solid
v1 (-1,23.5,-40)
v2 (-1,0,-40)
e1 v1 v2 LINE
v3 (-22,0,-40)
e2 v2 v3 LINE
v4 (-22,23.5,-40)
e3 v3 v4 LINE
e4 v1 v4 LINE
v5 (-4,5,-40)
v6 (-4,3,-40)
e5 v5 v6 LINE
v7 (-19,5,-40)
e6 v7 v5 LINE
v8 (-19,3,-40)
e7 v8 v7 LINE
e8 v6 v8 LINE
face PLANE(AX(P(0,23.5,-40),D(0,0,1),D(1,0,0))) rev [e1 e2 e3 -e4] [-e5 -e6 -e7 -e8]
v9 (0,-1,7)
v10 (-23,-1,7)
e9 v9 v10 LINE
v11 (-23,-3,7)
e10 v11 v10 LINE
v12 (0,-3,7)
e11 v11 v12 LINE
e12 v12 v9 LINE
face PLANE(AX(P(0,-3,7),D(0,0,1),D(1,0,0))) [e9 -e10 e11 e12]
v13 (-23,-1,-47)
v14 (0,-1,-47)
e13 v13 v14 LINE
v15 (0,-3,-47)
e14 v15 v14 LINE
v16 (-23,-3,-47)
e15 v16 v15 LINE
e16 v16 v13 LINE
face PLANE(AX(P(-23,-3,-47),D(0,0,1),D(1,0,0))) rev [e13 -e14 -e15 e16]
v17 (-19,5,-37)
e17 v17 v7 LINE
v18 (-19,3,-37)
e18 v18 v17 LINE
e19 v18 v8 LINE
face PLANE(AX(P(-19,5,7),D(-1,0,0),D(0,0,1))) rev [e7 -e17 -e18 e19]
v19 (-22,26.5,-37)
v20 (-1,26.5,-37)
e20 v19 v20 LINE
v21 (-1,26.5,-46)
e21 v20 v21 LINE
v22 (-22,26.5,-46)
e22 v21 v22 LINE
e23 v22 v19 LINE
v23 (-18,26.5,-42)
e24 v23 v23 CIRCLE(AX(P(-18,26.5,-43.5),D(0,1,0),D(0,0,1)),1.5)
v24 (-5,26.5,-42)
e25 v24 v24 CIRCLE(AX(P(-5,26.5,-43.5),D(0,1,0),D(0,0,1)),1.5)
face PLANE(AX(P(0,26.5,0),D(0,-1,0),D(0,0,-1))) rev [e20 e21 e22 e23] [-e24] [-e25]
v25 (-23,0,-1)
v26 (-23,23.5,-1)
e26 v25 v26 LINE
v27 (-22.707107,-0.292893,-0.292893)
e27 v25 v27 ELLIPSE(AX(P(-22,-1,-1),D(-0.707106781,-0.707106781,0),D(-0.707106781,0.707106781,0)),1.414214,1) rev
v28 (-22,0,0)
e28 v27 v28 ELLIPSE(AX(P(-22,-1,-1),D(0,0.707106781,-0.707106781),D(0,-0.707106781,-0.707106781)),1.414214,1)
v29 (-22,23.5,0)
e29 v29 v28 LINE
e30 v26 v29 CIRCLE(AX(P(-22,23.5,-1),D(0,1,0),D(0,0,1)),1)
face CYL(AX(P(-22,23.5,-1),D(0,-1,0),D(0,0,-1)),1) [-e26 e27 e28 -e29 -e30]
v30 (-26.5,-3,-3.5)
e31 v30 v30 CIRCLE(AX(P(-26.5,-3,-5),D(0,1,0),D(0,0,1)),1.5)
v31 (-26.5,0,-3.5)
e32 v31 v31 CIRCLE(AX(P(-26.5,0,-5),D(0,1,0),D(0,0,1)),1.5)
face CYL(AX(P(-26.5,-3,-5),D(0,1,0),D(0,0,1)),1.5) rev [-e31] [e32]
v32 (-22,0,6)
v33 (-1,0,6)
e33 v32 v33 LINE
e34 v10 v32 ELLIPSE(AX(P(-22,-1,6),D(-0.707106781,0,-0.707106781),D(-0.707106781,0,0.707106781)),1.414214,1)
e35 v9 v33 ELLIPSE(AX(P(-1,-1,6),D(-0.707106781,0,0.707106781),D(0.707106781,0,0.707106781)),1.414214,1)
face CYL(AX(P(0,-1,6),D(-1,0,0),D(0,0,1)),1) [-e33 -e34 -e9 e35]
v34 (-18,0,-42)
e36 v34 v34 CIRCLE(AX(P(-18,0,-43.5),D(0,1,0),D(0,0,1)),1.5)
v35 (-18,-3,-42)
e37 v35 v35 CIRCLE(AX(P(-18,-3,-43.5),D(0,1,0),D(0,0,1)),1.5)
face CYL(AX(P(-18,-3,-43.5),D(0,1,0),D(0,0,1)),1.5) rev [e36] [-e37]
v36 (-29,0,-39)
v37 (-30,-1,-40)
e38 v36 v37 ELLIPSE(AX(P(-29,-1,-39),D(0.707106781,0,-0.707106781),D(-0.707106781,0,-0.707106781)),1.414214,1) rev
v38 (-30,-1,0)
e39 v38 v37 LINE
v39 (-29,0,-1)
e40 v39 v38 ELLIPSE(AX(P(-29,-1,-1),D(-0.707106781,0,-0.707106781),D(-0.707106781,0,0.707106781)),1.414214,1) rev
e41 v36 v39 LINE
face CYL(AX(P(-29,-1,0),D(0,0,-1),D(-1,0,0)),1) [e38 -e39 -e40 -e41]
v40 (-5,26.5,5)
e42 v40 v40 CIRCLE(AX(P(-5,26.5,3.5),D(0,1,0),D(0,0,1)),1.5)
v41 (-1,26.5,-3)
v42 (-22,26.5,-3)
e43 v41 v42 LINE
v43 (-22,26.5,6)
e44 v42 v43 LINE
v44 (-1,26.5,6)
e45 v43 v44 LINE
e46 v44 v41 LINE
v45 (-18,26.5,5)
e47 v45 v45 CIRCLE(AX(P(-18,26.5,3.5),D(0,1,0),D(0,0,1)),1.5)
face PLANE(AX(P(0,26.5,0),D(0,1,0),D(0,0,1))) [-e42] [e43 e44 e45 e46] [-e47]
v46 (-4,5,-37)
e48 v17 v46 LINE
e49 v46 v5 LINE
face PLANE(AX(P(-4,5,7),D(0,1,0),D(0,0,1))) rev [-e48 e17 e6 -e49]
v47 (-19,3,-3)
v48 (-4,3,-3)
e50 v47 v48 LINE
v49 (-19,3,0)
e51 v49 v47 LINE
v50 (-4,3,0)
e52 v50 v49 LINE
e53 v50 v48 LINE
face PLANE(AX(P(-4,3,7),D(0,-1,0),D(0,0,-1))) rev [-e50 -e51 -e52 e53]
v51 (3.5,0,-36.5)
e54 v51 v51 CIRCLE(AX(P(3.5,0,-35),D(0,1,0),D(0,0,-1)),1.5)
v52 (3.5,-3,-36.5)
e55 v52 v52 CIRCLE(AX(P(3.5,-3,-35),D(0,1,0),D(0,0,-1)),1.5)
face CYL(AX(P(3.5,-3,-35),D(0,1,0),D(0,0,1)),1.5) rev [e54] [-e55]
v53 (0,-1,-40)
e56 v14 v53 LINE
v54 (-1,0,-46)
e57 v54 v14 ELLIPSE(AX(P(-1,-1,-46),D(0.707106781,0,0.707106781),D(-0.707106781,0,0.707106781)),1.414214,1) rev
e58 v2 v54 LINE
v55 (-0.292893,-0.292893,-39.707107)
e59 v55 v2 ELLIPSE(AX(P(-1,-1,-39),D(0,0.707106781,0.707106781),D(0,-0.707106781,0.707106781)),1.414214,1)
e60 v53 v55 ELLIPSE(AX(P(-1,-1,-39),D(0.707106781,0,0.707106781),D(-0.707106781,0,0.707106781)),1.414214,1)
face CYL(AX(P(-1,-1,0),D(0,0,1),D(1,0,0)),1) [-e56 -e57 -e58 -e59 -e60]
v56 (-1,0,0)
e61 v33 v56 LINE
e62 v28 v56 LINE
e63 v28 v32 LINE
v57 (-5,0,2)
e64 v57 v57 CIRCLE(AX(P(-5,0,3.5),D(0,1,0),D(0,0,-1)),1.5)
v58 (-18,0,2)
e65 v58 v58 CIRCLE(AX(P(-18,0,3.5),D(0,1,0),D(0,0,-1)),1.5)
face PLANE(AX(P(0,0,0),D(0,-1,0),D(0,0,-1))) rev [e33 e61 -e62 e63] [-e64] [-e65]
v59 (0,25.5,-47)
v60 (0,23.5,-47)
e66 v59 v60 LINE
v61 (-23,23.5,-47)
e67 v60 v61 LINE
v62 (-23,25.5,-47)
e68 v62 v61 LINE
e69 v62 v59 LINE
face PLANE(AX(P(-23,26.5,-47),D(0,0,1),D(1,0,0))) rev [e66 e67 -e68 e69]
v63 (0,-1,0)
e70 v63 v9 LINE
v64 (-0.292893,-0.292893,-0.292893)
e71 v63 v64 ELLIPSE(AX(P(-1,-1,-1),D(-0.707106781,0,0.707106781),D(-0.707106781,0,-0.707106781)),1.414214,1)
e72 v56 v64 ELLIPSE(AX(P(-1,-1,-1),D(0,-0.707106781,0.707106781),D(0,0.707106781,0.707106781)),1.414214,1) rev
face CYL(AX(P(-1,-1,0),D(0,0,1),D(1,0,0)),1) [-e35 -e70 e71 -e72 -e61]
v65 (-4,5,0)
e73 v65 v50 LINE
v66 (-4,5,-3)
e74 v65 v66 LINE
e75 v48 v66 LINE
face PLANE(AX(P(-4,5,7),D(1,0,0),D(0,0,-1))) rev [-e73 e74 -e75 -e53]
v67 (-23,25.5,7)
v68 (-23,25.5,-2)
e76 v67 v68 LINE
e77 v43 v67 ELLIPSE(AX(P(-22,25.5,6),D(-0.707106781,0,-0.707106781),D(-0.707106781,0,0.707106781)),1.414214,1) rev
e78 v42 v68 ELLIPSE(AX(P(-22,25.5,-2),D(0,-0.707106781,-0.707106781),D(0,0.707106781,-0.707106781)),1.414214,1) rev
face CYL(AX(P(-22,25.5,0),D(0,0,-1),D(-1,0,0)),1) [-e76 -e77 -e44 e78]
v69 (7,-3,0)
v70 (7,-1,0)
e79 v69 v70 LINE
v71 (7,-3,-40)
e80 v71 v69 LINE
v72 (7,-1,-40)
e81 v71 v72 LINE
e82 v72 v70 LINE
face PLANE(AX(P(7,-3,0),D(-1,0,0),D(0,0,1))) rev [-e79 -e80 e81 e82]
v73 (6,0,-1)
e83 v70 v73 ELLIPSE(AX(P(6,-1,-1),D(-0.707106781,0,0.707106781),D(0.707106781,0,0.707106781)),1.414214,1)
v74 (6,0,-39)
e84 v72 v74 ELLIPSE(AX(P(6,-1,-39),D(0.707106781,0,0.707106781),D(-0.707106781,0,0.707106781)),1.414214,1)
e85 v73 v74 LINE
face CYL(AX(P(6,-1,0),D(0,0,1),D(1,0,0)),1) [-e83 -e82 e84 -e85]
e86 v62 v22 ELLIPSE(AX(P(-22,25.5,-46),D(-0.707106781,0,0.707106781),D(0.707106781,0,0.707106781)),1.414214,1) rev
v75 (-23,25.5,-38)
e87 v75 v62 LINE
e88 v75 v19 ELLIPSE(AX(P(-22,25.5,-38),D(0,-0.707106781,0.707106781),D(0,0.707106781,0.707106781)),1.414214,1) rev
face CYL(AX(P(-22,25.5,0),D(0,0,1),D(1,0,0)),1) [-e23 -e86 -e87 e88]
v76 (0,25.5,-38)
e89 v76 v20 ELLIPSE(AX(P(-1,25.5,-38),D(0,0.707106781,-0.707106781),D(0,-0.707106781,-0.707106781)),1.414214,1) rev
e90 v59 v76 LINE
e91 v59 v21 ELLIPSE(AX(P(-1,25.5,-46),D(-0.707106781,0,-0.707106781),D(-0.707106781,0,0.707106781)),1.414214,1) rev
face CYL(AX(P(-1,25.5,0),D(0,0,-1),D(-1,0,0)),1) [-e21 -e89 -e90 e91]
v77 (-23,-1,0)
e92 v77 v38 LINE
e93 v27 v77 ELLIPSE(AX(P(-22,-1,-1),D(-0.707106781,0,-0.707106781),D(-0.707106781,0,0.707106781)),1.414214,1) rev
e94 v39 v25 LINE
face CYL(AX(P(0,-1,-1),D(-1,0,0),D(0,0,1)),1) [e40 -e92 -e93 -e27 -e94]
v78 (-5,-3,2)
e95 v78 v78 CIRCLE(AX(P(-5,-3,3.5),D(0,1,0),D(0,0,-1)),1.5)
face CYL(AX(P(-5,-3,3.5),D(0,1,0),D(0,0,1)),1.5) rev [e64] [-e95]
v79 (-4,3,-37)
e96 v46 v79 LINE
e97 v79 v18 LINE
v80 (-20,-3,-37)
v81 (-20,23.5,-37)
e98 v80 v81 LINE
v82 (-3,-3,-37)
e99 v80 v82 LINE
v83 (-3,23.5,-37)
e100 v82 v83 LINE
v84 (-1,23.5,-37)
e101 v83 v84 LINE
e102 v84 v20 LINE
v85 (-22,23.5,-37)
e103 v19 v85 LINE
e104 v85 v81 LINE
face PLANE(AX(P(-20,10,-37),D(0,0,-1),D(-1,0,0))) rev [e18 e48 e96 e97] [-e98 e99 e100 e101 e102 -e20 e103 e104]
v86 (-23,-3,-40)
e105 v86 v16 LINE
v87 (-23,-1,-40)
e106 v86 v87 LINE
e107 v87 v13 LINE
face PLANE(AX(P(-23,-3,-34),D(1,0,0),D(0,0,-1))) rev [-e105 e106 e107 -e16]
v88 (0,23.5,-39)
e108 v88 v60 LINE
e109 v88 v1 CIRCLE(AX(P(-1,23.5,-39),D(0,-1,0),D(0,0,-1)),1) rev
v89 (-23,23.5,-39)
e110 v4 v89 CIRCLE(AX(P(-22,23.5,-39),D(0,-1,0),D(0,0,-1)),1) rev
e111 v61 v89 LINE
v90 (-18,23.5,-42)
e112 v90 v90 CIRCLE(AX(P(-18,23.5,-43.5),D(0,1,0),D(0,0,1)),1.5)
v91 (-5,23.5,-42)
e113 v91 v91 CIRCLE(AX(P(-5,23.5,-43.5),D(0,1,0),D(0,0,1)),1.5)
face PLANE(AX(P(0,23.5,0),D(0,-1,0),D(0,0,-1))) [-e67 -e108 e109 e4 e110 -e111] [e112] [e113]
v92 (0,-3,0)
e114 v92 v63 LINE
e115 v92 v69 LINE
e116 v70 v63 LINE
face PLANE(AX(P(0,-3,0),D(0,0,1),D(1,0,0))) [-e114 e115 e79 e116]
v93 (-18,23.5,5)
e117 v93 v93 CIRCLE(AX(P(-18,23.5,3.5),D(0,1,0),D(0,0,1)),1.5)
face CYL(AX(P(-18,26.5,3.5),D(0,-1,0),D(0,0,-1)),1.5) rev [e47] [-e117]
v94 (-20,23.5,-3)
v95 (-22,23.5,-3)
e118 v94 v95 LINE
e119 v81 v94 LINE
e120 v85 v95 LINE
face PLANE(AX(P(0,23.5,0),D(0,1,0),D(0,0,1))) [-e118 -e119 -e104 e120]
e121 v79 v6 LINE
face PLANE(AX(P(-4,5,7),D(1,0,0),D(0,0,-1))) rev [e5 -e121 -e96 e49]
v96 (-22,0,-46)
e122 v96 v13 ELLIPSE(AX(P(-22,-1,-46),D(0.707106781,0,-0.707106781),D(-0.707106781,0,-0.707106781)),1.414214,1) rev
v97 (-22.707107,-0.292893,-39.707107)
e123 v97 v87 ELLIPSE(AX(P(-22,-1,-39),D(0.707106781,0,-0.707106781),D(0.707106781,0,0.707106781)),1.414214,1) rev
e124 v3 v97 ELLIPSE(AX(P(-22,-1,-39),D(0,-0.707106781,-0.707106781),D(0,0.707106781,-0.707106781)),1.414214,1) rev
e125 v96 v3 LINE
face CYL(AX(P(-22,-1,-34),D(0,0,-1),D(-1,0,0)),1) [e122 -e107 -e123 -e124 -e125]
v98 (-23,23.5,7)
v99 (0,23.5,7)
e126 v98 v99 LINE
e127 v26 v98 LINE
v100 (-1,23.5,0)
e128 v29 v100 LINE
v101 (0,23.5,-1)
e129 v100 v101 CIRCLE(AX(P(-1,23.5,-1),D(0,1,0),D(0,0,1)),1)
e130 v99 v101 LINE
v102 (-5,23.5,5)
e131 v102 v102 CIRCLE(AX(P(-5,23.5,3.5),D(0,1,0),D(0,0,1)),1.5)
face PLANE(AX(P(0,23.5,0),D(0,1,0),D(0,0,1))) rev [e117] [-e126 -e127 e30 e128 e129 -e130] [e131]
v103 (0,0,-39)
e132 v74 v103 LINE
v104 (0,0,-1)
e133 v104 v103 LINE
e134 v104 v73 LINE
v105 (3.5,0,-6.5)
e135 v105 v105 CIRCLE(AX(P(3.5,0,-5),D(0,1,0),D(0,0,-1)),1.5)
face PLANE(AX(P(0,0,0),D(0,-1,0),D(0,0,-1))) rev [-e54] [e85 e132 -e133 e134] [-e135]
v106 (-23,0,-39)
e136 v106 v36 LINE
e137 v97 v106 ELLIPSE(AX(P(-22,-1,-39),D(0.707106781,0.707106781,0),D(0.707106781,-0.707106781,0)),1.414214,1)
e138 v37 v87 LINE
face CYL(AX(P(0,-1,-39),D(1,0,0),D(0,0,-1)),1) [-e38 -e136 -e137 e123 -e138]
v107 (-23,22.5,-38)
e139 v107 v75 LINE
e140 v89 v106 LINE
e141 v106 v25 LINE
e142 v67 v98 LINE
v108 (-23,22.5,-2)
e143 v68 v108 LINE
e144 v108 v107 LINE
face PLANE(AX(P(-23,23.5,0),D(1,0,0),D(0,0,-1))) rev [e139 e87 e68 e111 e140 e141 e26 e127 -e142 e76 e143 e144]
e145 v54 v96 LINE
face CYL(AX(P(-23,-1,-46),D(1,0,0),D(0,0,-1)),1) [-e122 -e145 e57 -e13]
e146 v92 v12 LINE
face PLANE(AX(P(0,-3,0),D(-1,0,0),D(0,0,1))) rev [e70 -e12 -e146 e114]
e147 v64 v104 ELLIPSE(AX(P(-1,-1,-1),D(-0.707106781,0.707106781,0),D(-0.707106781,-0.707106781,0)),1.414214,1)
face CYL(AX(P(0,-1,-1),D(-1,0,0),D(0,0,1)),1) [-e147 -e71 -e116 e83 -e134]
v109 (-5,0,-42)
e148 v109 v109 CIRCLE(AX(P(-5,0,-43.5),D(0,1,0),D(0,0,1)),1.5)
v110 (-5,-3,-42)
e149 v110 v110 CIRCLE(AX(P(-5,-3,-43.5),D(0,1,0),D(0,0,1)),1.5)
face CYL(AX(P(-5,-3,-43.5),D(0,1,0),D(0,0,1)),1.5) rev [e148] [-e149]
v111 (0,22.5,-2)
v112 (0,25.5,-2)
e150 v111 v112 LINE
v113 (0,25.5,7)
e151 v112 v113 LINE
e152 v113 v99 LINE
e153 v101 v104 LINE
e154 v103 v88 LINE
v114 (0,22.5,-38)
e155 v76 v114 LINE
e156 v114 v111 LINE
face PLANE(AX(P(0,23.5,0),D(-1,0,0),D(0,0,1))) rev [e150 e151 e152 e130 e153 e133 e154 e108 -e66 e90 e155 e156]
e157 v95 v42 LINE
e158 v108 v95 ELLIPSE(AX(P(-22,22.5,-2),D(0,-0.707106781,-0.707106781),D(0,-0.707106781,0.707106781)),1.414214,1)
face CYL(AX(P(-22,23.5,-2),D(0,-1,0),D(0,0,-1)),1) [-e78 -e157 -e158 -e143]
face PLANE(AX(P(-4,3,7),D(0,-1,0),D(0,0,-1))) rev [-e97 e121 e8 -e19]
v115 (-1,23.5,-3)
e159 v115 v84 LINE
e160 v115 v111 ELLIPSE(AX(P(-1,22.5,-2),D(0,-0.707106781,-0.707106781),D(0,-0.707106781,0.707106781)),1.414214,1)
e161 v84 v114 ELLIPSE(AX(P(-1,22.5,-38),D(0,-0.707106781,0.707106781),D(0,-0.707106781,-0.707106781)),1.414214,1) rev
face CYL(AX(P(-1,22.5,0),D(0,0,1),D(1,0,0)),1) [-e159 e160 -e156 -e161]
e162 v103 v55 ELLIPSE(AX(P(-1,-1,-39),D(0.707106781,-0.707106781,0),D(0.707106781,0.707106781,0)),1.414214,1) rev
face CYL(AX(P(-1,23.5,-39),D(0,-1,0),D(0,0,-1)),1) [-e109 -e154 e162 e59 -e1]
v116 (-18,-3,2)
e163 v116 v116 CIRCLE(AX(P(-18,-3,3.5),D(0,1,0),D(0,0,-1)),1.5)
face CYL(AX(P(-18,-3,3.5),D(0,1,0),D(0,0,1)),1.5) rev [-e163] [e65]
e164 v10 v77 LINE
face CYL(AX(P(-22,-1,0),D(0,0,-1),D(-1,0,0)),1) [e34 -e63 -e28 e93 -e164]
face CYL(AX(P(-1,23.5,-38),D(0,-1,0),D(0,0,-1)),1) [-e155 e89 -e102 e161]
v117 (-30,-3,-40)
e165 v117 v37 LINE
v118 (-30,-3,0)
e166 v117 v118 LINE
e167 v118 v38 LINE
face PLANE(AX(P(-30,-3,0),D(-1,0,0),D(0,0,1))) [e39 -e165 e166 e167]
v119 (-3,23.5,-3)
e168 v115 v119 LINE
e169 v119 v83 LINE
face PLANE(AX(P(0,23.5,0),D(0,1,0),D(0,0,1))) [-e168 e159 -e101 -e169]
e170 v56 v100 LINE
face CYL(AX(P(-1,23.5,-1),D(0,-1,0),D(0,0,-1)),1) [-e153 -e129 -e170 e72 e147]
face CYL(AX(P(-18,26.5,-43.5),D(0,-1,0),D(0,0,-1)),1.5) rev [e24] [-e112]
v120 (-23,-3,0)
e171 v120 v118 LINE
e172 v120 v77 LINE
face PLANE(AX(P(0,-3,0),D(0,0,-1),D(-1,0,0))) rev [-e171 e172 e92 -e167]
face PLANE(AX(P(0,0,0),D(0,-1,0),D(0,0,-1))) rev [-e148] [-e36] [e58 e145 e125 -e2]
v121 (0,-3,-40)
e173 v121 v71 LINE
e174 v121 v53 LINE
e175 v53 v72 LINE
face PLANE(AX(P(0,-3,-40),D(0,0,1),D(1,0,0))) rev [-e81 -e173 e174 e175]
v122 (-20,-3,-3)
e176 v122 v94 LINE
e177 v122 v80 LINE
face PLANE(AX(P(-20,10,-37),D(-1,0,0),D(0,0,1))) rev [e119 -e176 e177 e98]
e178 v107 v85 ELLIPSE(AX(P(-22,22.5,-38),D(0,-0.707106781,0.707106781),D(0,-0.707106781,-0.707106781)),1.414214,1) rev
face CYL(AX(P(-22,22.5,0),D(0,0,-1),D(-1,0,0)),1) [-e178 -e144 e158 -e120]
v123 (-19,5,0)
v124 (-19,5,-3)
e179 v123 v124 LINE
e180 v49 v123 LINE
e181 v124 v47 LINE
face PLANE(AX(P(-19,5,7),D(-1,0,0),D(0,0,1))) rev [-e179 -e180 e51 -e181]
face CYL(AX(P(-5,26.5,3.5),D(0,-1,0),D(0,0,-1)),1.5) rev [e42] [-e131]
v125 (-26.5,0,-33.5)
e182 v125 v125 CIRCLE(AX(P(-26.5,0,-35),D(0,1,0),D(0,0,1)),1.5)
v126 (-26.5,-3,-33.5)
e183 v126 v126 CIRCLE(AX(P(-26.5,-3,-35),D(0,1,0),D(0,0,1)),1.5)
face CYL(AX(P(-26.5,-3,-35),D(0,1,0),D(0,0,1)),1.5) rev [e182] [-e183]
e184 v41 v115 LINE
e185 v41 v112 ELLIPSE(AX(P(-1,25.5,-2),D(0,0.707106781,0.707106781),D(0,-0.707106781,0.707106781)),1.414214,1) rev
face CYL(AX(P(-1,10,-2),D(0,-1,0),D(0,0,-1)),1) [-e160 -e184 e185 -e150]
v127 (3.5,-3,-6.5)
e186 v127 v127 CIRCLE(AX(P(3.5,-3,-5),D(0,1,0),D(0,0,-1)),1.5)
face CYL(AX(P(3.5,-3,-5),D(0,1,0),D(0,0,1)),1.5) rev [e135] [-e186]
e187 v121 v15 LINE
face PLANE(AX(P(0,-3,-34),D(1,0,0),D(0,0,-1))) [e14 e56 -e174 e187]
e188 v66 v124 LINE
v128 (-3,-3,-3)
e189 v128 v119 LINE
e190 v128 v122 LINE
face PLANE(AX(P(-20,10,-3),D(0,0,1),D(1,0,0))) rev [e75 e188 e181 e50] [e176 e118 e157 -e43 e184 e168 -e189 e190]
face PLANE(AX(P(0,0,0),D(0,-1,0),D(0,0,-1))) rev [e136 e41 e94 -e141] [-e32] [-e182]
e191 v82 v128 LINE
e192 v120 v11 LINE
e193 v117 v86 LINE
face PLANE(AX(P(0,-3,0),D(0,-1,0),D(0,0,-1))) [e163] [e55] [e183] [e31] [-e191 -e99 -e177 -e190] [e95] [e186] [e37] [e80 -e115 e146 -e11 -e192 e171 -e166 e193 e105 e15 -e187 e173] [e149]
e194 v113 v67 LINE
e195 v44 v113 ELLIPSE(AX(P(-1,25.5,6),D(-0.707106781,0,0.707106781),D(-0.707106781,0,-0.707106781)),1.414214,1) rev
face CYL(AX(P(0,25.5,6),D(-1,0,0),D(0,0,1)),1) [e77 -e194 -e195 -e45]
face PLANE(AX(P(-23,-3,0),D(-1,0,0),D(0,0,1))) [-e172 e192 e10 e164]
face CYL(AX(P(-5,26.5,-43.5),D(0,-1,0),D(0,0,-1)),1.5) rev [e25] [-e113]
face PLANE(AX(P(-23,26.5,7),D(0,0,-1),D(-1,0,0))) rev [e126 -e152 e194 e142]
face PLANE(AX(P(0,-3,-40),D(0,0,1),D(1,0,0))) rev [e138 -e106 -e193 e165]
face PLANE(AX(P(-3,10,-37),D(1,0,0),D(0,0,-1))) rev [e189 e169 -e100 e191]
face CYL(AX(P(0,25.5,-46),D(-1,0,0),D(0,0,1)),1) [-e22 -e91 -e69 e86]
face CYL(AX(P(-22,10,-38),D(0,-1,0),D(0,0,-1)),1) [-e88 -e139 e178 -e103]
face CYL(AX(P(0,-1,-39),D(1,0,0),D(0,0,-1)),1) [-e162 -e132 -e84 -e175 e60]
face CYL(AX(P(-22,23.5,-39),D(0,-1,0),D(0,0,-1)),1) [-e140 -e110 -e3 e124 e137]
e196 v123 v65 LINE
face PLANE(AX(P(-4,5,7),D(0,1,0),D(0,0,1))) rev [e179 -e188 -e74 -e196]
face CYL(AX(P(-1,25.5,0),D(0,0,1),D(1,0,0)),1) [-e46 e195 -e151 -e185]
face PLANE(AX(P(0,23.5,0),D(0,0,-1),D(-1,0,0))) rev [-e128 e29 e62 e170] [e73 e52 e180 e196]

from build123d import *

# Parameters (mm, degrees)
CROQUIS2_W              = 23
CROQUIS2_H              = 40
SALIENTE_EXTRUIR1_DEPTH = 23.5
CROQUIS3_W              = 17
CROQUIS3_H              = 34
CORTAR_EXTRUIR1_DEPTH   = 13.5
CROQUIS4_W              = 13
CROQUIS4_H              = 40
CROQUIS4_W_2            = 23
CROQUIS4_H_2            = 13
SALIENTE_EXTRUIR6_DEPTH = 3
CROQUIS6_R              = 1.5
CORTAR_EXTRUIR2_DEPTH   = 61.508263898
SALIENTE_EXTRUIR7_START = 3
CROQUIS7_W              = 23
CROQUIS7_H              = 10
CROQUIS7_R              = 1.5
SALIENTE_EXTRUIR7_DEPTH = 3
REDONDEO1_R             = 1
REDONDEO2_R             = 1
REDONDEO3_R             = 1
CROQUIS8_W              = 17
CROQUIS8_H              = 34
CORTAR_EXTRUIR3_DEPTH   = 64.081296753
CROQUIS9_W              = 15
CROQUIS9_H              = 2
CORTAR_EXTRUIR4_DEPTH   = 62.735322142


with BuildPart() as part:
    # Croquis2 → Saliente-Extruir1 (new body)
    with BuildSketch(Plane(origin=(0, 0, 0), x_dir=(1, 0, 0), z_dir=(0, 1, 0))):
        with Locations((-11.5, 20)):
            Rectangle(CROQUIS2_W, CROQUIS2_H)
    extrude(amount=SALIENTE_EXTRUIR1_DEPTH)

    # Croquis3 → Cortar-Extruir1 (cut)
    with BuildSketch(Plane(origin=(0, 23.5, 0), x_dir=(1, 0, 0), z_dir=(0, 1, 0))):
        with Locations((-11.5, 20)):
            Rectangle(CROQUIS3_W, CROQUIS3_H)
    extrude(amount=-CORTAR_EXTRUIR1_DEPTH, mode=Mode.SUBTRACT)

    # Croquis4 → Saliente-Extruir6 (add)
    with BuildSketch(Plane.XZ):
        with Locations((-23.5, -20)):
            Rectangle(CROQUIS4_W, CROQUIS4_H)
        with Locations((-11.5, 0.5)):
            Rectangle(CROQUIS4_W_2, CROQUIS4_H_2)
        with Locations((0.5, -20)):
            Rectangle(CROQUIS4_W, CROQUIS4_H)
        with Locations((-11.5, -40.5)):
            Rectangle(CROQUIS4_W_2, CROQUIS4_H_2)
    extrude(amount=SALIENTE_EXTRUIR6_DEPTH)

    # Croquis6 → Cortar-Extruir2 (cut, through all)
    with BuildSketch(Plane(origin=(0, 0, 0), x_dir=(1, 0, 0), z_dir=(0, 1, 0))):
        with Locations(Location((-26.5, 5, 0), (0, 0, 270))):
            Circle(CROQUIS6_R)
        with Locations(Location((-26.5, 35, 0), (0, 0, 270))):
            Circle(CROQUIS6_R)
        with Locations(Location((-18, 43.5, 0), (0, 0, 270))):
            Circle(CROQUIS6_R)
        with Locations(Location((-5, 43.5, 0), (0, 0, 270))):
            Circle(CROQUIS6_R)
        with Locations(Location((3.5, 5, 0), (0, 0, 90))):
            Circle(CROQUIS6_R)
        with Locations(Location((3.5, 35, 0), (0, 0, 90))):
            Circle(CROQUIS6_R)
        with Locations(Location((-5, -3.5, 0), (0, 0, 90))):
            Circle(CROQUIS6_R)
        with Locations(Location((-18, -3.5, 0), (0, 0, 90))):
            Circle(CROQUIS6_R)
    extrude(amount=-CORTAR_EXTRUIR2_DEPTH, mode=Mode.SUBTRACT)

    # Croquis7 → Saliente-Extruir7 (add)
    # profile 1 of 2: a face of its own
    with BuildSketch(Plane(origin=(0, 23.5, 0), x_dir=(1, 0, 0), z_dir=(0, 1, 0)).offset(SALIENTE_EXTRUIR7_START)):
        with Locations((-11.5, 42)):
            Rectangle(CROQUIS7_W, CROQUIS7_H)
        with Locations(Location((-18, 43.5, 0), (0, 0, 270))):
            Circle(CROQUIS7_R, mode=Mode.SUBTRACT)
        with Locations(Location((-5, 43.5, 0), (0, 0, 270))):
            Circle(CROQUIS7_R, mode=Mode.SUBTRACT)
    # profile 2 of 2: a face of its own
    with BuildSketch(Plane(origin=(0, 23.5, 0), x_dir=(1, 0, 0), z_dir=(0, 1, 0)).offset(SALIENTE_EXTRUIR7_START)):
        with Locations((-11.5, -2)):
            Rectangle(CROQUIS7_W, CROQUIS7_H)
        with Locations(Location((-18, -3.5, 0), (0, 0, 90))):
            Circle(CROQUIS7_R, mode=Mode.SUBTRACT)
        with Locations(Location((-5, -3.5, 0), (0, 0, 90))):
            Circle(CROQUIS7_R, mode=Mode.SUBTRACT)
    extrude(amount=-SALIENTE_EXTRUIR7_DEPTH)

    # Redondeo1
    # the kernel refuses this fillet: 1 mm, written as the material it takes off along each edge
    with BuildSketch(Plane(origin=(-23, 0, -40), x_dir=(0, 0, 1), z_dir=(0, 1, 0)), Plane(origin=(-23, 0, 0), x_dir=(1, 0, 0), z_dir=(0, 1, 0))) as redondeo1_piece_1:
        with BuildLine():
            CenterArc((REDONDEO1_R, REDONDEO1_R), REDONDEO1_R, 180, 90)
            Line((0, REDONDEO1_R), (0, 0))
            Line((0, 0), (REDONDEO1_R, 0))
        make_face()
    extrude(amount=23.5, mode=Mode.SUBTRACT)
    with BuildSketch(Plane(origin=(0, 0, -40), x_dir=(0, 0, 1), z_dir=(0, 1, 0)), Plane(origin=(0, 0, 0), x_dir=(-1, 0, 0), z_dir=(0, 1, 0))) as redondeo1_piece_2:
        with BuildLine():
            CenterArc((REDONDEO1_R, -REDONDEO1_R), REDONDEO1_R, 90, 90)
            Line((0, -REDONDEO1_R), (0, 0))
            Line((0, 0), (REDONDEO1_R, 0))
        make_face()
    extrude(amount=23.5, mode=Mode.SUBTRACT)

    # Redondeo2
    # the kernel refuses this fillet: 1 mm, written as the material it takes off along each edge
    with BuildSketch(Plane(origin=(-30, 0, -42.5), x_dir=(1, 0, 0), z_dir=(0, 0, 1))) as redondeo2_piece_1:
        with BuildLine():
            CenterArc((REDONDEO2_R, -REDONDEO2_R), REDONDEO2_R, 90, 90)
            Line((0, -REDONDEO2_R), (0, 0))
            Line((0, 0), (REDONDEO2_R, 0))
        make_face()
    extrude(amount=45, mode=Mode.SUBTRACT)
    with BuildSketch(Plane(origin=(-32.5, 0, 0), x_dir=(0, 0, -1), z_dir=(1, 0, 0)), Plane(origin=(-23, 0, -40), x_dir=(0, 0, 1), z_dir=(-1, 0, 0)), Plane(origin=(0, 0, -40), x_dir=(-1, 0, 0), z_dir=(0, 0, -1)), Plane(origin=(-23, 0, -49.5), x_dir=(1, 0, 0), z_dir=(0, 0, 1))) as redondeo2_piece_2:
        with BuildLine():
            CenterArc((REDONDEO2_R, -REDONDEO2_R), REDONDEO2_R, 90, 90)
            Line((0, -REDONDEO2_R), (0, 0))
            Line((0, 0), (REDONDEO2_R, 0))
        make_face()
    extrude(amount=9.5, mode=Mode.SUBTRACT)
    with BuildSketch(Plane(origin=(9.5, 0, 0), x_dir=(0, 0, -1), z_dir=(-1, 0, 0)), Plane(origin=(-23, 0, 9.5), x_dir=(1, 0, 0), z_dir=(0, 0, -1)), Plane(origin=(0, 0, -40), x_dir=(0, 0, 1), z_dir=(1, 0, 0)), Plane(origin=(0, 0, 0), x_dir=(-1, 0, 0), z_dir=(0, 0, 1))) as redondeo2_piece_3:
        with BuildLine():
            CenterArc((REDONDEO2_R, REDONDEO2_R), REDONDEO2_R, 180, 90)
            Line((0, REDONDEO2_R), (0, 0))
            Line((0, 0), (REDONDEO2_R, 0))
        make_face()
    extrude(amount=9.5, mode=Mode.SUBTRACT)
    with BuildSketch(Plane(origin=(2.5, 0, 7), x_dir=(0, 0, -1), z_dir=(-1, 0, 0))) as redondeo2_piece_4:
        with BuildLine():
            CenterArc((REDONDEO2_R, REDONDEO2_R), REDONDEO2_R, 180, 90)
            Line((0, REDONDEO2_R), (0, 0))
            Line((0, 0), (REDONDEO2_R, 0))
        make_face()
    extrude(amount=28, mode=Mode.SUBTRACT)
    with BuildSketch(Plane(origin=(7, 0, -42.5), x_dir=(-1, 0, 0), z_dir=(0, 0, 1))) as redondeo2_piece_5:
        with BuildLine():
            CenterArc((REDONDEO2_R, REDONDEO2_R), REDONDEO2_R, 180, 90)
            Line((0, REDONDEO2_R), (0, 0))
            Line((0, 0), (REDONDEO2_R, 0))
        make_face()
    extrude(amount=45, mode=Mode.SUBTRACT)
    with BuildSketch(Plane(origin=(2.5, 0, -47), x_dir=(0, 0, 1), z_dir=(-1, 0, 0))) as redondeo2_piece_6:
        with BuildLine():
            CenterArc((REDONDEO2_R, -REDONDEO2_R), REDONDEO2_R, 90, 90)
            Line((0, -REDONDEO2_R), (0, 0))
            Line((0, 0), (REDONDEO2_R, 0))
        make_face()
    extrude(amount=28, mode=Mode.SUBTRACT)
    with BuildSketch(Plane(origin=(-32.5, 0, 0), x_dir=(0, 0, -1), z_dir=(1, 0, 0))) as redondeo2_piece_7a_section:
        with BuildLine():
            CenterArc((REDONDEO2_R, -REDONDEO2_R), REDONDEO2_R, 90, 90)
            Line((0, -REDONDEO2_R), (0, 0))
            Line((0, 0), (REDONDEO2_R, 0))
        make_face()
    redondeo2_piece_7a = extrude(amount=12, mode=Mode.PRIVATE)
    redondeo2_piece_7a = redondeo2_piece_7a - Plane(origin=(-22, -0.287823154, -1), x_dir=(1, 0, 0), z_dir=(0, -1, 0)) * Cylinder(1, 28, mode=Mode.PRIVATE)
    redondeo2_piece_7a = split(redondeo2_piece_7a, bisect_by=Plane(origin=(-23, -0.287823154, -0.287823154), z_dir=(1, 0, 0)), keep=Keep.TOP, mode=Mode.PRIVATE)
    with BuildSketch(Plane(origin=(-23, 0, 9.5), x_dir=(1, 0, 0), z_dir=(0, 0, -1))) as redondeo2_piece_7b_section:
        with BuildLine():
            CenterArc((REDONDEO2_R, REDONDEO2_R), REDONDEO2_R, 180, 90)
            Line((0, REDONDEO2_R), (0, 0))
            Line((0, 0), (REDONDEO2_R, 0))
        make_face()
    redondeo2_piece_7b = extrude(amount=12, mode=Mode.PRIVATE)
    redondeo2_piece_7b = split(redondeo2_piece_7b, bisect_by=Plane(origin=(-22.712176846, -0.287823154, 0), z_dir=(0, 0, -1)), keep=Keep.TOP, mode=Mode.PRIVATE)
    redondeo2_piece_7b = redondeo2_piece_7b - Plane(origin=(-22, -0.287823154, -1), x_dir=(1, 0, 0), z_dir=(0, -1, 0)) * Cylinder(1, 29, mode=Mode.PRIVATE)
    redondeo2_piece_7 = redondeo2_piece_7a & redondeo2_piece_7b
    add(redondeo2_piece_7, mode=Mode.SUBTRACT)
    with BuildSketch(Plane(origin=(-23, 0, -49.5), x_dir=(1, 0, 0), z_dir=(0, 0, 1))) as redondeo2_piece_8a_section:
        with BuildLine():
            CenterArc((REDONDEO2_R, -REDONDEO2_R), REDONDEO2_R, 90, 90)
            Line((0, -REDONDEO2_R), (0, 0))
            Line((0, 0), (REDONDEO2_R, 0))
        make_face()
    redondeo2_piece_8a = extrude(amount=12, mode=Mode.PRIVATE)
    redondeo2_piece_8a = redondeo2_piece_8a - Plane(origin=(-22, -0.287823154, -39), x_dir=(0, 0, 1), z_dir=(0, -1, 0)) * Cylinder(1, 28, mode=Mode.PRIVATE)
    redondeo2_piece_8a = split(redondeo2_piece_8a, bisect_by=Plane(origin=(-22.712176846, -0.287823154, -40), z_dir=(0, 0, 1)), keep=Keep.TOP, mode=Mode.PRIVATE)
    with BuildSketch(Plane(origin=(-20.5, 0, -40), x_dir=(0, 0, 1), z_dir=(-1, 0, 0))) as redondeo2_piece_8b_section:
        with BuildLine():
            CenterArc((REDONDEO2_R, -REDONDEO2_R), REDONDEO2_R, 90, 90)
            Line((0, -REDONDEO2_R), (0, 0))
            Line((0, 0), (REDONDEO2_R, 0))
        make_face()
    redondeo2_piece_8b = extrude(amount=12, mode=Mode.PRIVATE)
    redondeo2_piece_8b = split(redondeo2_piece_8b, bisect_by=Plane(origin=(-23, -0.287823154, -39.712176846), z_dir=(1, 0, 0)), keep=Keep.TOP, mode=Mode.PRIVATE)
    redondeo2_piece_8b = redondeo2_piece_8b - Plane(origin=(-22, -0.287823154, -39), x_dir=(0, 0, 1), z_dir=(0, -1, 0)) * Cylinder(1, 28, mode=Mode.PRIVATE)
    redondeo2_piece_8 = redondeo2_piece_8a & redondeo2_piece_8b
    add(redondeo2_piece_8, mode=Mode.SUBTRACT)
    with BuildSketch(Plane(origin=(0, 0, -2.5), x_dir=(-1, 0, 0), z_dir=(0, 0, 1))) as redondeo2_piece_9a_section:
        with BuildLine():
            CenterArc((REDONDEO2_R, REDONDEO2_R), REDONDEO2_R, 180, 90)
            Line((0, REDONDEO2_R), (0, 0))
            Line((0, 0), (REDONDEO2_R, 0))
        make_face()
    redondeo2_piece_9a = extrude(amount=12, mode=Mode.PRIVATE)
    redondeo2_piece_9a = split(redondeo2_piece_9a, bisect_by=Plane(origin=(-0.287823154, -0.287823154, 0), z_dir=(0, 0, -1)), keep=Keep.TOP, mode=Mode.PRIVATE)
    redondeo2_piece_9a = redondeo2_piece_9a - Plane(origin=(-1, -0.287823154, -1), x_dir=(-1, 0, 0), z_dir=(0, -1, 0)) * Cylinder(1, 29, mode=Mode.PRIVATE)
    with BuildSketch(Plane(origin=(9.5, 0, 0), x_dir=(0, 0, -1), z_dir=(-1, 0, 0))) as redondeo2_piece_9b_section:
        with BuildLine():
            CenterArc((REDONDEO2_R, REDONDEO2_R), REDONDEO2_R, 180, 90)
            Line((0, REDONDEO2_R), (0, 0))
            Line((0, 0), (REDONDEO2_R, 0))
        make_face()
    redondeo2_piece_9b = extrude(amount=12, mode=Mode.PRIVATE)
    redondeo2_piece_9b = split(redondeo2_piece_9b, bisect_by=Plane(origin=(0, -0.287823154, -0.287823154), z_dir=(-1, 0, 0)), keep=Keep.TOP, mode=Mode.PRIVATE)
    redondeo2_piece_9b = redondeo2_piece_9b - Plane(origin=(-1, -0.287823154, -1), x_dir=(-1, 0, 0), z_dir=(0, -1, 0)) * Cylinder(1, 28, mode=Mode.PRIVATE)
    redondeo2_piece_9 = redondeo2_piece_9a & redondeo2_piece_9b
    add(redondeo2_piece_9, mode=Mode.SUBTRACT)
    with BuildSketch(Plane(origin=(-2.5, 0, -40), x_dir=(0, 0, 1), z_dir=(1, 0, 0))) as redondeo2_piece_10a_section:
        with BuildLine():
            CenterArc((REDONDEO2_R, REDONDEO2_R), REDONDEO2_R, 180, 90)
            Line((0, REDONDEO2_R), (0, 0))
            Line((0, 0), (REDONDEO2_R, 0))
        make_face()
    redondeo2_piece_10a = extrude(amount=12, mode=Mode.PRIVATE)
    redondeo2_piece_10a = redondeo2_piece_10a - Plane(origin=(-1, -0.287823154, -39), x_dir=(0, 0, 1), z_dir=(0, -1, 0)) * Cylinder(1, 28, mode=Mode.PRIVATE)
    redondeo2_piece_10a = split(redondeo2_piece_10a, bisect_by=Plane(origin=(0, -0.287823154, -39.712176846), z_dir=(-1, 0, 0)), keep=Keep.TOP, mode=Mode.PRIVATE)
    with BuildSketch(Plane(origin=(0, 0, -37.5), x_dir=(-1, 0, 0), z_dir=(0, 0, -1))) as redondeo2_piece_10b_section:
        with BuildLine():
            CenterArc((REDONDEO2_R, -REDONDEO2_R), REDONDEO2_R, 90, 90)
            Line((0, -REDONDEO2_R), (0, 0))
            Line((0, 0), (REDONDEO2_R, 0))
        make_face()
    redondeo2_piece_10b = extrude(amount=12, mode=Mode.PRIVATE)
    redondeo2_piece_10b = split(redondeo2_piece_10b, bisect_by=Plane(origin=(-0.287823154, -0.287823154, -40), z_dir=(0, 0, 1)), keep=Keep.TOP, mode=Mode.PRIVATE)
    redondeo2_piece_10b = redondeo2_piece_10b - Plane(origin=(-1, -0.287823154, -39), x_dir=(0, 0, 1), z_dir=(0, -1, 0)) * Cylinder(1, 28, mode=Mode.PRIVATE)
    redondeo2_piece_10 = redondeo2_piece_10a & redondeo2_piece_10b
    add(redondeo2_piece_10, mode=Mode.SUBTRACT)

    # Redondeo3
    redondeo3_edges = [part.edges().sort_by_distance(p)[0] for p in [
        (0, 25, -37),
        (0, 25, -3),
        (-23, 25, -3),
        (-23, 25, -37),
        (-23, 23.5, -20),
        (0, 23.5, -20),
        (0, 26.5, 2),
        (-23, 26.5, 2),
        (-11.5, 26.5, 7),
        (0, 26.5, -42),
        (-11.5, 26.5, -47),
        (-23, 26.5, -42),
    ]]
    fillet(redondeo3_edges, radius=REDONDEO3_R)

    # Croquis8 → Cortar-Extruir3 (cut, through all)
    with BuildSketch(Plane(origin=(0, -3, 0), x_dir=(-1, 0, 0), z_dir=(0, -1, 0))):
        with Locations((11.5, 20)):
            Rectangle(CROQUIS8_W, CROQUIS8_H)
    extrude(amount=-CORTAR_EXTRUIR3_DEPTH, mode=Mode.SUBTRACT)

    # Croquis9 → Cortar-Extruir4 (cut, through all)
    with BuildSketch(Plane(origin=(0, 0, -40), x_dir=(-1, 0, 0), z_dir=(0, 0, -1))):
        with Locations((11.5, 4)):
            Rectangle(CROQUIS9_W, CROQUIS9_H)
    extrude(amount=-CORTAR_EXTRUIR4_DEPTH, mode=Mode.SUBTRACT)


solid = part.part
